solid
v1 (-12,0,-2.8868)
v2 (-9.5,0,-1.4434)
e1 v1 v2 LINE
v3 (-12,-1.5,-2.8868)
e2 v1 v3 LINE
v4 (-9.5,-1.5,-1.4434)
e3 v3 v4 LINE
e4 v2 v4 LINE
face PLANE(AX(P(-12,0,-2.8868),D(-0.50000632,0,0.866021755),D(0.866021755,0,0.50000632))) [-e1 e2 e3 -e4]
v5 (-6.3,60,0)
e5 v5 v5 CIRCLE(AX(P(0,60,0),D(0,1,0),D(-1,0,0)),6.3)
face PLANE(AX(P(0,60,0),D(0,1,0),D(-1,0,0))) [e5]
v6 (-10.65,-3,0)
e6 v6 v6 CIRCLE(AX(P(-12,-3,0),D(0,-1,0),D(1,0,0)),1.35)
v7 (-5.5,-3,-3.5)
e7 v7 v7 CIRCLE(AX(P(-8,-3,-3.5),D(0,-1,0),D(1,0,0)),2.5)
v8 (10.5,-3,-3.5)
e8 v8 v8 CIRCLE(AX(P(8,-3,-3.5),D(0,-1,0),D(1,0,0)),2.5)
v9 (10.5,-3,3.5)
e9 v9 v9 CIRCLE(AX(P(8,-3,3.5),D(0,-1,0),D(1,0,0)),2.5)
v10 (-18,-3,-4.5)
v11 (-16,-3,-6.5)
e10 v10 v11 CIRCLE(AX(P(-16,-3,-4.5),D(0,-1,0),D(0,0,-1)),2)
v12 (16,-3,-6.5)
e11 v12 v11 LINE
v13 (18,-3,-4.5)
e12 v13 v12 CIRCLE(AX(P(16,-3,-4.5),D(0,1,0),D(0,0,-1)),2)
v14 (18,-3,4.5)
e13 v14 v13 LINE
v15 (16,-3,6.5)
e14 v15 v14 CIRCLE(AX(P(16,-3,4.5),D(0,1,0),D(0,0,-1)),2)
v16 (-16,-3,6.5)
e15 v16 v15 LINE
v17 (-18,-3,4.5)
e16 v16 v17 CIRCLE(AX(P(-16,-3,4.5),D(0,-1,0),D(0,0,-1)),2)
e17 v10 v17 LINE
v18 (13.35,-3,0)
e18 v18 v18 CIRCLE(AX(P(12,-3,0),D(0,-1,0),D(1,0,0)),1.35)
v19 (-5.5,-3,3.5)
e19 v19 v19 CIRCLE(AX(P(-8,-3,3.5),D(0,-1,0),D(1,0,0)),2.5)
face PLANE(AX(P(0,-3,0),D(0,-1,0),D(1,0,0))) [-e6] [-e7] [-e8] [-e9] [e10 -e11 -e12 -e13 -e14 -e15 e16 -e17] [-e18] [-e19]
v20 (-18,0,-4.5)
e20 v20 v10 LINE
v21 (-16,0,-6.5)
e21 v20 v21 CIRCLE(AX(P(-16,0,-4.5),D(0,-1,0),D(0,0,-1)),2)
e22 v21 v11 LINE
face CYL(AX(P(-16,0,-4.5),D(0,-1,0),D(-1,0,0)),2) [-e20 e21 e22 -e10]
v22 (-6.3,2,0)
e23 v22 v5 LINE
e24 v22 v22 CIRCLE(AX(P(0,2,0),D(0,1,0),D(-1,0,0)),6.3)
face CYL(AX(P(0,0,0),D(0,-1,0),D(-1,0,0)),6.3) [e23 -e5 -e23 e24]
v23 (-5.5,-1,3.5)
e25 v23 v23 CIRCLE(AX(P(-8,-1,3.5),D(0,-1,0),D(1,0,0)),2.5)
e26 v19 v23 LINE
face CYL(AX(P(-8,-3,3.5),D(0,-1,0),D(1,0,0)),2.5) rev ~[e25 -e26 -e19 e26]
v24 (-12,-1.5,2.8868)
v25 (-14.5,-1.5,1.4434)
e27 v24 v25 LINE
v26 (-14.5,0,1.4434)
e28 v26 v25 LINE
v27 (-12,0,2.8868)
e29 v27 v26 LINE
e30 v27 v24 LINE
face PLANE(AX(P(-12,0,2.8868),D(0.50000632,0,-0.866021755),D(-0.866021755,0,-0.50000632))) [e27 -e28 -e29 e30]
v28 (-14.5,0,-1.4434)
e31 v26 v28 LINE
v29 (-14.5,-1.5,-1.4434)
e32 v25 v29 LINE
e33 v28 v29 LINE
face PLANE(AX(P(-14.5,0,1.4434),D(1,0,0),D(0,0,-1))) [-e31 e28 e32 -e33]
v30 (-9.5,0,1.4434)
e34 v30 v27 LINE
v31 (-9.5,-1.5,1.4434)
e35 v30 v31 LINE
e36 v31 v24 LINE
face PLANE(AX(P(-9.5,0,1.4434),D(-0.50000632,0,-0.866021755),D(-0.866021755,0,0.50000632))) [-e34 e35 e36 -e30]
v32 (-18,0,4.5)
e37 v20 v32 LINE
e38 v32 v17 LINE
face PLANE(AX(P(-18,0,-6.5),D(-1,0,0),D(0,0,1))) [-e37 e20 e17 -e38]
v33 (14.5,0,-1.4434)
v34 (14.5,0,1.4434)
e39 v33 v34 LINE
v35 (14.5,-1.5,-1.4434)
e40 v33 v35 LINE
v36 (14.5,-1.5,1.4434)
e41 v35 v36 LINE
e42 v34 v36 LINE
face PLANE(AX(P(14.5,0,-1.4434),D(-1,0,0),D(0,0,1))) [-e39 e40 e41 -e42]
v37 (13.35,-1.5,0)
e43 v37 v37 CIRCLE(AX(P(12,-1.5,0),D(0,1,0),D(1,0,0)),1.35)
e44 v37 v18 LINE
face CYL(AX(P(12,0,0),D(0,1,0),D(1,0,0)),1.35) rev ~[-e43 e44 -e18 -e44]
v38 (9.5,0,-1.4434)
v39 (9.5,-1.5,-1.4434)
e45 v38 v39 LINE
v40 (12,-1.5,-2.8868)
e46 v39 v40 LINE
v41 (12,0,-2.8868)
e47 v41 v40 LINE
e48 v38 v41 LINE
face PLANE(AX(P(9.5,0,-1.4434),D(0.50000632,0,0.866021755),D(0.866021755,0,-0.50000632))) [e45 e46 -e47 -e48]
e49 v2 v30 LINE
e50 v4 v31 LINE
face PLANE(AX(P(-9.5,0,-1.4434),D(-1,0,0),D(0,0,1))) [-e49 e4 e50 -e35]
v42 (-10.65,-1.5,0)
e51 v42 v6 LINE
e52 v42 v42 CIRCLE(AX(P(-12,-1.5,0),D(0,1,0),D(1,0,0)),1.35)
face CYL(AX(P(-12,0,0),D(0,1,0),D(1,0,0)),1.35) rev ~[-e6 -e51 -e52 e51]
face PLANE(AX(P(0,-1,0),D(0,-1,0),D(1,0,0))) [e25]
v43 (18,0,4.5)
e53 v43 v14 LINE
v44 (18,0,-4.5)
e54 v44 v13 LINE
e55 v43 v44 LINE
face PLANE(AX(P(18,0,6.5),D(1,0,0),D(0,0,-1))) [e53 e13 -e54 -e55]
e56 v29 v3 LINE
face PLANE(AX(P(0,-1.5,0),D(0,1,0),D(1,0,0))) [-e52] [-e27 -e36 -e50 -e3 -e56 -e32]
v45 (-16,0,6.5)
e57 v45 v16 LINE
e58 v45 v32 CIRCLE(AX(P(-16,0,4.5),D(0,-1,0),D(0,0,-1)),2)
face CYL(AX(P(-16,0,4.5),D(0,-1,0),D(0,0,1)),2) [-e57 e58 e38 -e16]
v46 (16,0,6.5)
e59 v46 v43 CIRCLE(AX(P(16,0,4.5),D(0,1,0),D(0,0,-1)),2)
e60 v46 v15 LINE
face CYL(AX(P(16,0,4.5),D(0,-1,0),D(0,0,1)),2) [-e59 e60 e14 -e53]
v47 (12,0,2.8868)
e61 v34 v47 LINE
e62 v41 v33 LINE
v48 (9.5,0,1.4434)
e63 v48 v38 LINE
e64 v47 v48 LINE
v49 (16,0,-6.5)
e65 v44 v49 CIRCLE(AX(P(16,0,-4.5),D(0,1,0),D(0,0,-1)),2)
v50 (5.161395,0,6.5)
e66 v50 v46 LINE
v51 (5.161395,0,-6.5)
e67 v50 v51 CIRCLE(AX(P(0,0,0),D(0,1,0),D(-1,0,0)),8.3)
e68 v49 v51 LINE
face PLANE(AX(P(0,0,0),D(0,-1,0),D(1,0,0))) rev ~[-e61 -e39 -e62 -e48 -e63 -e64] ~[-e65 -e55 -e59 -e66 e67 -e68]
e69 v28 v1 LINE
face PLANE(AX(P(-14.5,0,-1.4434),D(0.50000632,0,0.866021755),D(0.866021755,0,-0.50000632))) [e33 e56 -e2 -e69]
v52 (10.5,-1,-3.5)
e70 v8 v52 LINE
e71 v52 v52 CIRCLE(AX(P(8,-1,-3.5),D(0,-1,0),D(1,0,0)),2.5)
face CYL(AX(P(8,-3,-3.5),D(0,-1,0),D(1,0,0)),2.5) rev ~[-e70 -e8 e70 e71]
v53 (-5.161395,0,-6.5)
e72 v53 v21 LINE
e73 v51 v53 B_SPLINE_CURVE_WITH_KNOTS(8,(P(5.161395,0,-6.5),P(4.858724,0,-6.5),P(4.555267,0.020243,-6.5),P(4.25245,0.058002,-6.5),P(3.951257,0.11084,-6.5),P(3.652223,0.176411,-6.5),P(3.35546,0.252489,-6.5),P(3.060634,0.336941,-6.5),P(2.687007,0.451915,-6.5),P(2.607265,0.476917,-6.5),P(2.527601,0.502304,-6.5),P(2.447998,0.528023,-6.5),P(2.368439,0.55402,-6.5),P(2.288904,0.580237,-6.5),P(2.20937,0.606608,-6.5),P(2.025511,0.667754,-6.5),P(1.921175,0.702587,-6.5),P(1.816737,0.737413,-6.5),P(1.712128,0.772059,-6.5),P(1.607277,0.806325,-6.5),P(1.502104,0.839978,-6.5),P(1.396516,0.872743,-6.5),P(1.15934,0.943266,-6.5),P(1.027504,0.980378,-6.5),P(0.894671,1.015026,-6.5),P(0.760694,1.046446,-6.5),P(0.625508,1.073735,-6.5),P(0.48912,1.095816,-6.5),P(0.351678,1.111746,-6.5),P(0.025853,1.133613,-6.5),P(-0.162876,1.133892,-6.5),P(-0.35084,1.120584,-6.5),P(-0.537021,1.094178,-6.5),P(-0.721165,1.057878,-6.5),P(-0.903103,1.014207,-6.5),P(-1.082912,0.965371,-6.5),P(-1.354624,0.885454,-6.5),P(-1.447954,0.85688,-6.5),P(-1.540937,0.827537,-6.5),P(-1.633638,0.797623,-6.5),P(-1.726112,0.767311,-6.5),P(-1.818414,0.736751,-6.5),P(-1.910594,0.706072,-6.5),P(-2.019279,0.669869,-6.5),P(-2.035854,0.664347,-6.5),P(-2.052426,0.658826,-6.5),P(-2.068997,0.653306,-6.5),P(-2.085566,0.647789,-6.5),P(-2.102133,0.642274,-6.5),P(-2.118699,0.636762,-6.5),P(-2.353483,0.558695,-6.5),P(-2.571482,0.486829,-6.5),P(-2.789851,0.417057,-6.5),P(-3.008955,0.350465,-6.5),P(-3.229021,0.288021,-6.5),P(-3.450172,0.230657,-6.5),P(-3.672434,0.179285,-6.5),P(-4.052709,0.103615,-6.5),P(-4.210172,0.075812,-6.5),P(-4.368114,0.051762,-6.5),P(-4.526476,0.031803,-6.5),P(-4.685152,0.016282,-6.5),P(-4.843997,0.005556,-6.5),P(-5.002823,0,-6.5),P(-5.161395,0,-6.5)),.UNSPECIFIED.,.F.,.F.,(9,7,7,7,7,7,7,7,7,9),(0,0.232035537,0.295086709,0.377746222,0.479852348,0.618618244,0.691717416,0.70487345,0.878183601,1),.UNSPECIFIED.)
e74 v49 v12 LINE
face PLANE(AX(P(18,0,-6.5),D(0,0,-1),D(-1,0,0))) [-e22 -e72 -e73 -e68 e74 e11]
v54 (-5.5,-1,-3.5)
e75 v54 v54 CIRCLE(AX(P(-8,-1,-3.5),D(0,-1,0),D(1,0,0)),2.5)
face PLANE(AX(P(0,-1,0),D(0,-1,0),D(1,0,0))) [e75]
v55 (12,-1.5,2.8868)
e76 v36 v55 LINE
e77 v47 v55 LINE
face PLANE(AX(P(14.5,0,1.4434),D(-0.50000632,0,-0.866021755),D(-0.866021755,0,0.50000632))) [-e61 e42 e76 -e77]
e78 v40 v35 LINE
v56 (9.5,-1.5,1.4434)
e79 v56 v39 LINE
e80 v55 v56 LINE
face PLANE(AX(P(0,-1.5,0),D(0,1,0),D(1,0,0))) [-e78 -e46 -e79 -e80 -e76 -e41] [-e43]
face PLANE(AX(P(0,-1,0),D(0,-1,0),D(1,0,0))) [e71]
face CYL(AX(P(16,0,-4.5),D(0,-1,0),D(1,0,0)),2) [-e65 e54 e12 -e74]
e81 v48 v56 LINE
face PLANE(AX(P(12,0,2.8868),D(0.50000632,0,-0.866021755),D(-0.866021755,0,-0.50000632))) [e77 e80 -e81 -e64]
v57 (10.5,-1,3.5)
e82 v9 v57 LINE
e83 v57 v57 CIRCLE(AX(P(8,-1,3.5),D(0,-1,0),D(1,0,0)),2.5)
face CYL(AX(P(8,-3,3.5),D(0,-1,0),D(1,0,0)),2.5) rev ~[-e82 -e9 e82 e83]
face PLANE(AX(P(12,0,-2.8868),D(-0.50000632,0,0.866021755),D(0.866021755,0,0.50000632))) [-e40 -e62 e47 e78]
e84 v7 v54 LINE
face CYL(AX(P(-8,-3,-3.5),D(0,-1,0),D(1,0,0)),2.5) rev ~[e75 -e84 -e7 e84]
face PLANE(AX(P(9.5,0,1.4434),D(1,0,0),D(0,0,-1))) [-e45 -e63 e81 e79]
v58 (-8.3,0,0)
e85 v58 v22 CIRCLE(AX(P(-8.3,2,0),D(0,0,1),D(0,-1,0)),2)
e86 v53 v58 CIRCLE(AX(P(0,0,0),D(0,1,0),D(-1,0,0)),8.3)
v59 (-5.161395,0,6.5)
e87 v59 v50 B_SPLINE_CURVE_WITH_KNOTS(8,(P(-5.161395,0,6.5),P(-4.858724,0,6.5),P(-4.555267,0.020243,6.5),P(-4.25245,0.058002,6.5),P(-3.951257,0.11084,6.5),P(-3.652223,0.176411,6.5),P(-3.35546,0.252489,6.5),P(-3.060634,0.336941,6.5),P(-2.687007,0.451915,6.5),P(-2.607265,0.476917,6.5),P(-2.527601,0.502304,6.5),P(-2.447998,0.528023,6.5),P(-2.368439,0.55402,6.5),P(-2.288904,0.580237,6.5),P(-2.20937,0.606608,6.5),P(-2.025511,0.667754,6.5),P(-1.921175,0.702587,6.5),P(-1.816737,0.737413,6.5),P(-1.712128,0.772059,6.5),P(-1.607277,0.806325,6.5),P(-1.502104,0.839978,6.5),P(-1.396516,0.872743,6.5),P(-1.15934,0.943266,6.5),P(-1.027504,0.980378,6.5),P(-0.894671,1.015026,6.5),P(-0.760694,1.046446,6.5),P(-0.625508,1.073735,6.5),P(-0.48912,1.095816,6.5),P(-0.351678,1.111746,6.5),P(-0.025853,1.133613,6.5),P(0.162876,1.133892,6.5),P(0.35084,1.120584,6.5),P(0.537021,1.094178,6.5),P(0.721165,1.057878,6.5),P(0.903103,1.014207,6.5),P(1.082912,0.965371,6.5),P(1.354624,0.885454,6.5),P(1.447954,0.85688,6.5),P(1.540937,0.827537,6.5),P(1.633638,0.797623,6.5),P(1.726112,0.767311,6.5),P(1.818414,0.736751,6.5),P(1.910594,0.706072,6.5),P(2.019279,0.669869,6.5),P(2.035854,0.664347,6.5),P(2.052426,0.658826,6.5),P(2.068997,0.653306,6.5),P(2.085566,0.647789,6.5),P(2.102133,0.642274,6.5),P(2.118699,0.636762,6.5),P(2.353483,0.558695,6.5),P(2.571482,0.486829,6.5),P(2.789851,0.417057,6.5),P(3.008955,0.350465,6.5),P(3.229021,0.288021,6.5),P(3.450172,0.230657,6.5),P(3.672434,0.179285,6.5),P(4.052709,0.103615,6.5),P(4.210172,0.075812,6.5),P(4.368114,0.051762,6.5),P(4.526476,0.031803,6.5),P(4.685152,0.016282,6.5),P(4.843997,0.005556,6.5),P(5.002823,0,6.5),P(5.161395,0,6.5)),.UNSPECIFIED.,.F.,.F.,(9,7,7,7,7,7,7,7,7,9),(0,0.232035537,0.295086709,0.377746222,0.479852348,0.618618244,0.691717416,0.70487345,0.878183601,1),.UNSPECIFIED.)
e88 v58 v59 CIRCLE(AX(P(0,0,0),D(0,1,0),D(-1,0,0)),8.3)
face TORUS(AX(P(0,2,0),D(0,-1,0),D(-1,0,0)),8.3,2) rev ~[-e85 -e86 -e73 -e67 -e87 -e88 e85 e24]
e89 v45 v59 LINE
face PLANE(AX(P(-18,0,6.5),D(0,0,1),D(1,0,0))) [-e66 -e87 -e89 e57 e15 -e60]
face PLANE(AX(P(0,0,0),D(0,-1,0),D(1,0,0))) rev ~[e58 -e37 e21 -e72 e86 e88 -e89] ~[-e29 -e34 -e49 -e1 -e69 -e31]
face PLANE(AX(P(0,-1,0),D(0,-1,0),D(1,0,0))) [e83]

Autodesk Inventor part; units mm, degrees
ref_plane "YZ Plane" through (0, 0, 0) normal (1, 0, 0) x (0, 1, 0)
ref_plane "XZ Plane" through (0, 0, 0) normal (0, 1, 0) x (-1, 0, 0)
ref_plane "XY Plane" through (0, 0, 0) normal (0, 0, 1) x (1, 0, 0)
sketch "Sketch1" plane through (0, 0, 0) normal (0, 1, 0) x (-1, 0, 0)
  circle A0 centre (0, 0) radius 6.3
  dimension "d0" = 12.6
extrude "Extrusion1" add sketch "Sketch1" along normal blind 60
sketch "Sketch2" plane through (0, 0, 0) normal (0, -1, 0) x (1, 0, 0)
  line L0 (-18, 6.5) -> (18, 6.5)
  line L1 (18, 6.5) -> (18, -6.5)
  line L2 (18, -6.5) -> (-18, -6.5)
  line L3 (-18, -6.5) -> (-18, 6.5)
  line L4 (-18, 6.5) -> (18, -6.5) construction
  line L5 (18, 6.5) -> (-18, -6.5) construction
  circle A0 centre (12, 0) radius 1.35
  line L6 (0, 0) -> (0, 6.5) construction
  circle A1 centre (-12, 0) radius 1.35
  dimension "d3" = 2.7
  dimension "d4" = 12
  dimension "d5" = 36
  dimension "d6" = 13
extrude "Extrusion2" add sketch "Sketch2" along normal blind 3
fillet "Fillet1" radius 2 1 edges at (6.3, 0, 0)
fillet "Fillet2" radius 2 4 edges at (-18, -1.5, 6.5) (-18, -1.5, -6.5) (18, -1.5, 6.5) (18, -1.5, -6.5)
sketch "Sketch3" plane through (0, 0, 0) normal (0, 1, 0) x (1, 0, 0)
  circle A0 centre (12, 0) radius 1.35 projected
  line L0 (9.5, 1.4434) -> (12, 2.8868)
  line L1 (12, 2.8868) -> (14.5, 1.4434)
  line L2 (14.5, 1.4434) -> (14.5, -1.4434)
  line L3 (14.5, -1.4434) -> (12, -2.8868)
  line L4 (12, -2.8868) -> (9.5, -1.4434)
  line L5 (9.5, -1.4434) -> (9.5, 1.4434)
  circle A1 centre (-12, 0) radius 1.35 projected
  line L6 (-14.5, 1.4434) -> (-12, 2.8868)
  line L7 (-12, 2.8868) -> (-9.5, 1.4434)
  line L8 (-9.5, 1.4434) -> (-9.5, -1.4434)
  line L9 (-9.5, -1.4434) -> (-12, -2.8868)
  line L10 (-12, -2.8868) -> (-14.5, -1.4434)
  line L11 (-14.5, -1.4434) -> (-14.5, 1.4434)
  line L12 (18, 4.5) -> (18, -4.5) projected
  line L13 (-18, -4.5) -> (-18, 4.5) projected
  point P0 (0, 0)
  dimension "d11" = 5
  dimension "d12" = 5
extrude "Extrusion3" cut sketch "Sketch3" against normal blind 1.5
sketch "Sketch4" plane through (0, -3, 0) normal (0, -1, 0) x (1, 0, 0)
  circle A0 centre (-8, -3.5) radius 2.5
  circle A1 centre (-8, 3.5) radius 2.5
  circle A2 centre (-12, 0) radius 1.35 projected
  line L0 (0, 0) -> (0, 6.4158) construction
  circle A3 centre (8, -3.5) radius 2.5
  circle A4 centre (8, 3.5) radius 2.5
  circle A5 centre (12, 0) radius 1.35
  dimension "d15" = 5
  dimension "d16" = 5
  dimension "d17" = 4
  dimension "d18" = 3.5
  dimension "d19" = 4
  dimension "d20" = 3.5
extrude "Extrusion4" cut sketch "Sketch4" against normal blind 2 contours A0 | A1 | A3 | A4
properties part number "PWM3360 holder"
